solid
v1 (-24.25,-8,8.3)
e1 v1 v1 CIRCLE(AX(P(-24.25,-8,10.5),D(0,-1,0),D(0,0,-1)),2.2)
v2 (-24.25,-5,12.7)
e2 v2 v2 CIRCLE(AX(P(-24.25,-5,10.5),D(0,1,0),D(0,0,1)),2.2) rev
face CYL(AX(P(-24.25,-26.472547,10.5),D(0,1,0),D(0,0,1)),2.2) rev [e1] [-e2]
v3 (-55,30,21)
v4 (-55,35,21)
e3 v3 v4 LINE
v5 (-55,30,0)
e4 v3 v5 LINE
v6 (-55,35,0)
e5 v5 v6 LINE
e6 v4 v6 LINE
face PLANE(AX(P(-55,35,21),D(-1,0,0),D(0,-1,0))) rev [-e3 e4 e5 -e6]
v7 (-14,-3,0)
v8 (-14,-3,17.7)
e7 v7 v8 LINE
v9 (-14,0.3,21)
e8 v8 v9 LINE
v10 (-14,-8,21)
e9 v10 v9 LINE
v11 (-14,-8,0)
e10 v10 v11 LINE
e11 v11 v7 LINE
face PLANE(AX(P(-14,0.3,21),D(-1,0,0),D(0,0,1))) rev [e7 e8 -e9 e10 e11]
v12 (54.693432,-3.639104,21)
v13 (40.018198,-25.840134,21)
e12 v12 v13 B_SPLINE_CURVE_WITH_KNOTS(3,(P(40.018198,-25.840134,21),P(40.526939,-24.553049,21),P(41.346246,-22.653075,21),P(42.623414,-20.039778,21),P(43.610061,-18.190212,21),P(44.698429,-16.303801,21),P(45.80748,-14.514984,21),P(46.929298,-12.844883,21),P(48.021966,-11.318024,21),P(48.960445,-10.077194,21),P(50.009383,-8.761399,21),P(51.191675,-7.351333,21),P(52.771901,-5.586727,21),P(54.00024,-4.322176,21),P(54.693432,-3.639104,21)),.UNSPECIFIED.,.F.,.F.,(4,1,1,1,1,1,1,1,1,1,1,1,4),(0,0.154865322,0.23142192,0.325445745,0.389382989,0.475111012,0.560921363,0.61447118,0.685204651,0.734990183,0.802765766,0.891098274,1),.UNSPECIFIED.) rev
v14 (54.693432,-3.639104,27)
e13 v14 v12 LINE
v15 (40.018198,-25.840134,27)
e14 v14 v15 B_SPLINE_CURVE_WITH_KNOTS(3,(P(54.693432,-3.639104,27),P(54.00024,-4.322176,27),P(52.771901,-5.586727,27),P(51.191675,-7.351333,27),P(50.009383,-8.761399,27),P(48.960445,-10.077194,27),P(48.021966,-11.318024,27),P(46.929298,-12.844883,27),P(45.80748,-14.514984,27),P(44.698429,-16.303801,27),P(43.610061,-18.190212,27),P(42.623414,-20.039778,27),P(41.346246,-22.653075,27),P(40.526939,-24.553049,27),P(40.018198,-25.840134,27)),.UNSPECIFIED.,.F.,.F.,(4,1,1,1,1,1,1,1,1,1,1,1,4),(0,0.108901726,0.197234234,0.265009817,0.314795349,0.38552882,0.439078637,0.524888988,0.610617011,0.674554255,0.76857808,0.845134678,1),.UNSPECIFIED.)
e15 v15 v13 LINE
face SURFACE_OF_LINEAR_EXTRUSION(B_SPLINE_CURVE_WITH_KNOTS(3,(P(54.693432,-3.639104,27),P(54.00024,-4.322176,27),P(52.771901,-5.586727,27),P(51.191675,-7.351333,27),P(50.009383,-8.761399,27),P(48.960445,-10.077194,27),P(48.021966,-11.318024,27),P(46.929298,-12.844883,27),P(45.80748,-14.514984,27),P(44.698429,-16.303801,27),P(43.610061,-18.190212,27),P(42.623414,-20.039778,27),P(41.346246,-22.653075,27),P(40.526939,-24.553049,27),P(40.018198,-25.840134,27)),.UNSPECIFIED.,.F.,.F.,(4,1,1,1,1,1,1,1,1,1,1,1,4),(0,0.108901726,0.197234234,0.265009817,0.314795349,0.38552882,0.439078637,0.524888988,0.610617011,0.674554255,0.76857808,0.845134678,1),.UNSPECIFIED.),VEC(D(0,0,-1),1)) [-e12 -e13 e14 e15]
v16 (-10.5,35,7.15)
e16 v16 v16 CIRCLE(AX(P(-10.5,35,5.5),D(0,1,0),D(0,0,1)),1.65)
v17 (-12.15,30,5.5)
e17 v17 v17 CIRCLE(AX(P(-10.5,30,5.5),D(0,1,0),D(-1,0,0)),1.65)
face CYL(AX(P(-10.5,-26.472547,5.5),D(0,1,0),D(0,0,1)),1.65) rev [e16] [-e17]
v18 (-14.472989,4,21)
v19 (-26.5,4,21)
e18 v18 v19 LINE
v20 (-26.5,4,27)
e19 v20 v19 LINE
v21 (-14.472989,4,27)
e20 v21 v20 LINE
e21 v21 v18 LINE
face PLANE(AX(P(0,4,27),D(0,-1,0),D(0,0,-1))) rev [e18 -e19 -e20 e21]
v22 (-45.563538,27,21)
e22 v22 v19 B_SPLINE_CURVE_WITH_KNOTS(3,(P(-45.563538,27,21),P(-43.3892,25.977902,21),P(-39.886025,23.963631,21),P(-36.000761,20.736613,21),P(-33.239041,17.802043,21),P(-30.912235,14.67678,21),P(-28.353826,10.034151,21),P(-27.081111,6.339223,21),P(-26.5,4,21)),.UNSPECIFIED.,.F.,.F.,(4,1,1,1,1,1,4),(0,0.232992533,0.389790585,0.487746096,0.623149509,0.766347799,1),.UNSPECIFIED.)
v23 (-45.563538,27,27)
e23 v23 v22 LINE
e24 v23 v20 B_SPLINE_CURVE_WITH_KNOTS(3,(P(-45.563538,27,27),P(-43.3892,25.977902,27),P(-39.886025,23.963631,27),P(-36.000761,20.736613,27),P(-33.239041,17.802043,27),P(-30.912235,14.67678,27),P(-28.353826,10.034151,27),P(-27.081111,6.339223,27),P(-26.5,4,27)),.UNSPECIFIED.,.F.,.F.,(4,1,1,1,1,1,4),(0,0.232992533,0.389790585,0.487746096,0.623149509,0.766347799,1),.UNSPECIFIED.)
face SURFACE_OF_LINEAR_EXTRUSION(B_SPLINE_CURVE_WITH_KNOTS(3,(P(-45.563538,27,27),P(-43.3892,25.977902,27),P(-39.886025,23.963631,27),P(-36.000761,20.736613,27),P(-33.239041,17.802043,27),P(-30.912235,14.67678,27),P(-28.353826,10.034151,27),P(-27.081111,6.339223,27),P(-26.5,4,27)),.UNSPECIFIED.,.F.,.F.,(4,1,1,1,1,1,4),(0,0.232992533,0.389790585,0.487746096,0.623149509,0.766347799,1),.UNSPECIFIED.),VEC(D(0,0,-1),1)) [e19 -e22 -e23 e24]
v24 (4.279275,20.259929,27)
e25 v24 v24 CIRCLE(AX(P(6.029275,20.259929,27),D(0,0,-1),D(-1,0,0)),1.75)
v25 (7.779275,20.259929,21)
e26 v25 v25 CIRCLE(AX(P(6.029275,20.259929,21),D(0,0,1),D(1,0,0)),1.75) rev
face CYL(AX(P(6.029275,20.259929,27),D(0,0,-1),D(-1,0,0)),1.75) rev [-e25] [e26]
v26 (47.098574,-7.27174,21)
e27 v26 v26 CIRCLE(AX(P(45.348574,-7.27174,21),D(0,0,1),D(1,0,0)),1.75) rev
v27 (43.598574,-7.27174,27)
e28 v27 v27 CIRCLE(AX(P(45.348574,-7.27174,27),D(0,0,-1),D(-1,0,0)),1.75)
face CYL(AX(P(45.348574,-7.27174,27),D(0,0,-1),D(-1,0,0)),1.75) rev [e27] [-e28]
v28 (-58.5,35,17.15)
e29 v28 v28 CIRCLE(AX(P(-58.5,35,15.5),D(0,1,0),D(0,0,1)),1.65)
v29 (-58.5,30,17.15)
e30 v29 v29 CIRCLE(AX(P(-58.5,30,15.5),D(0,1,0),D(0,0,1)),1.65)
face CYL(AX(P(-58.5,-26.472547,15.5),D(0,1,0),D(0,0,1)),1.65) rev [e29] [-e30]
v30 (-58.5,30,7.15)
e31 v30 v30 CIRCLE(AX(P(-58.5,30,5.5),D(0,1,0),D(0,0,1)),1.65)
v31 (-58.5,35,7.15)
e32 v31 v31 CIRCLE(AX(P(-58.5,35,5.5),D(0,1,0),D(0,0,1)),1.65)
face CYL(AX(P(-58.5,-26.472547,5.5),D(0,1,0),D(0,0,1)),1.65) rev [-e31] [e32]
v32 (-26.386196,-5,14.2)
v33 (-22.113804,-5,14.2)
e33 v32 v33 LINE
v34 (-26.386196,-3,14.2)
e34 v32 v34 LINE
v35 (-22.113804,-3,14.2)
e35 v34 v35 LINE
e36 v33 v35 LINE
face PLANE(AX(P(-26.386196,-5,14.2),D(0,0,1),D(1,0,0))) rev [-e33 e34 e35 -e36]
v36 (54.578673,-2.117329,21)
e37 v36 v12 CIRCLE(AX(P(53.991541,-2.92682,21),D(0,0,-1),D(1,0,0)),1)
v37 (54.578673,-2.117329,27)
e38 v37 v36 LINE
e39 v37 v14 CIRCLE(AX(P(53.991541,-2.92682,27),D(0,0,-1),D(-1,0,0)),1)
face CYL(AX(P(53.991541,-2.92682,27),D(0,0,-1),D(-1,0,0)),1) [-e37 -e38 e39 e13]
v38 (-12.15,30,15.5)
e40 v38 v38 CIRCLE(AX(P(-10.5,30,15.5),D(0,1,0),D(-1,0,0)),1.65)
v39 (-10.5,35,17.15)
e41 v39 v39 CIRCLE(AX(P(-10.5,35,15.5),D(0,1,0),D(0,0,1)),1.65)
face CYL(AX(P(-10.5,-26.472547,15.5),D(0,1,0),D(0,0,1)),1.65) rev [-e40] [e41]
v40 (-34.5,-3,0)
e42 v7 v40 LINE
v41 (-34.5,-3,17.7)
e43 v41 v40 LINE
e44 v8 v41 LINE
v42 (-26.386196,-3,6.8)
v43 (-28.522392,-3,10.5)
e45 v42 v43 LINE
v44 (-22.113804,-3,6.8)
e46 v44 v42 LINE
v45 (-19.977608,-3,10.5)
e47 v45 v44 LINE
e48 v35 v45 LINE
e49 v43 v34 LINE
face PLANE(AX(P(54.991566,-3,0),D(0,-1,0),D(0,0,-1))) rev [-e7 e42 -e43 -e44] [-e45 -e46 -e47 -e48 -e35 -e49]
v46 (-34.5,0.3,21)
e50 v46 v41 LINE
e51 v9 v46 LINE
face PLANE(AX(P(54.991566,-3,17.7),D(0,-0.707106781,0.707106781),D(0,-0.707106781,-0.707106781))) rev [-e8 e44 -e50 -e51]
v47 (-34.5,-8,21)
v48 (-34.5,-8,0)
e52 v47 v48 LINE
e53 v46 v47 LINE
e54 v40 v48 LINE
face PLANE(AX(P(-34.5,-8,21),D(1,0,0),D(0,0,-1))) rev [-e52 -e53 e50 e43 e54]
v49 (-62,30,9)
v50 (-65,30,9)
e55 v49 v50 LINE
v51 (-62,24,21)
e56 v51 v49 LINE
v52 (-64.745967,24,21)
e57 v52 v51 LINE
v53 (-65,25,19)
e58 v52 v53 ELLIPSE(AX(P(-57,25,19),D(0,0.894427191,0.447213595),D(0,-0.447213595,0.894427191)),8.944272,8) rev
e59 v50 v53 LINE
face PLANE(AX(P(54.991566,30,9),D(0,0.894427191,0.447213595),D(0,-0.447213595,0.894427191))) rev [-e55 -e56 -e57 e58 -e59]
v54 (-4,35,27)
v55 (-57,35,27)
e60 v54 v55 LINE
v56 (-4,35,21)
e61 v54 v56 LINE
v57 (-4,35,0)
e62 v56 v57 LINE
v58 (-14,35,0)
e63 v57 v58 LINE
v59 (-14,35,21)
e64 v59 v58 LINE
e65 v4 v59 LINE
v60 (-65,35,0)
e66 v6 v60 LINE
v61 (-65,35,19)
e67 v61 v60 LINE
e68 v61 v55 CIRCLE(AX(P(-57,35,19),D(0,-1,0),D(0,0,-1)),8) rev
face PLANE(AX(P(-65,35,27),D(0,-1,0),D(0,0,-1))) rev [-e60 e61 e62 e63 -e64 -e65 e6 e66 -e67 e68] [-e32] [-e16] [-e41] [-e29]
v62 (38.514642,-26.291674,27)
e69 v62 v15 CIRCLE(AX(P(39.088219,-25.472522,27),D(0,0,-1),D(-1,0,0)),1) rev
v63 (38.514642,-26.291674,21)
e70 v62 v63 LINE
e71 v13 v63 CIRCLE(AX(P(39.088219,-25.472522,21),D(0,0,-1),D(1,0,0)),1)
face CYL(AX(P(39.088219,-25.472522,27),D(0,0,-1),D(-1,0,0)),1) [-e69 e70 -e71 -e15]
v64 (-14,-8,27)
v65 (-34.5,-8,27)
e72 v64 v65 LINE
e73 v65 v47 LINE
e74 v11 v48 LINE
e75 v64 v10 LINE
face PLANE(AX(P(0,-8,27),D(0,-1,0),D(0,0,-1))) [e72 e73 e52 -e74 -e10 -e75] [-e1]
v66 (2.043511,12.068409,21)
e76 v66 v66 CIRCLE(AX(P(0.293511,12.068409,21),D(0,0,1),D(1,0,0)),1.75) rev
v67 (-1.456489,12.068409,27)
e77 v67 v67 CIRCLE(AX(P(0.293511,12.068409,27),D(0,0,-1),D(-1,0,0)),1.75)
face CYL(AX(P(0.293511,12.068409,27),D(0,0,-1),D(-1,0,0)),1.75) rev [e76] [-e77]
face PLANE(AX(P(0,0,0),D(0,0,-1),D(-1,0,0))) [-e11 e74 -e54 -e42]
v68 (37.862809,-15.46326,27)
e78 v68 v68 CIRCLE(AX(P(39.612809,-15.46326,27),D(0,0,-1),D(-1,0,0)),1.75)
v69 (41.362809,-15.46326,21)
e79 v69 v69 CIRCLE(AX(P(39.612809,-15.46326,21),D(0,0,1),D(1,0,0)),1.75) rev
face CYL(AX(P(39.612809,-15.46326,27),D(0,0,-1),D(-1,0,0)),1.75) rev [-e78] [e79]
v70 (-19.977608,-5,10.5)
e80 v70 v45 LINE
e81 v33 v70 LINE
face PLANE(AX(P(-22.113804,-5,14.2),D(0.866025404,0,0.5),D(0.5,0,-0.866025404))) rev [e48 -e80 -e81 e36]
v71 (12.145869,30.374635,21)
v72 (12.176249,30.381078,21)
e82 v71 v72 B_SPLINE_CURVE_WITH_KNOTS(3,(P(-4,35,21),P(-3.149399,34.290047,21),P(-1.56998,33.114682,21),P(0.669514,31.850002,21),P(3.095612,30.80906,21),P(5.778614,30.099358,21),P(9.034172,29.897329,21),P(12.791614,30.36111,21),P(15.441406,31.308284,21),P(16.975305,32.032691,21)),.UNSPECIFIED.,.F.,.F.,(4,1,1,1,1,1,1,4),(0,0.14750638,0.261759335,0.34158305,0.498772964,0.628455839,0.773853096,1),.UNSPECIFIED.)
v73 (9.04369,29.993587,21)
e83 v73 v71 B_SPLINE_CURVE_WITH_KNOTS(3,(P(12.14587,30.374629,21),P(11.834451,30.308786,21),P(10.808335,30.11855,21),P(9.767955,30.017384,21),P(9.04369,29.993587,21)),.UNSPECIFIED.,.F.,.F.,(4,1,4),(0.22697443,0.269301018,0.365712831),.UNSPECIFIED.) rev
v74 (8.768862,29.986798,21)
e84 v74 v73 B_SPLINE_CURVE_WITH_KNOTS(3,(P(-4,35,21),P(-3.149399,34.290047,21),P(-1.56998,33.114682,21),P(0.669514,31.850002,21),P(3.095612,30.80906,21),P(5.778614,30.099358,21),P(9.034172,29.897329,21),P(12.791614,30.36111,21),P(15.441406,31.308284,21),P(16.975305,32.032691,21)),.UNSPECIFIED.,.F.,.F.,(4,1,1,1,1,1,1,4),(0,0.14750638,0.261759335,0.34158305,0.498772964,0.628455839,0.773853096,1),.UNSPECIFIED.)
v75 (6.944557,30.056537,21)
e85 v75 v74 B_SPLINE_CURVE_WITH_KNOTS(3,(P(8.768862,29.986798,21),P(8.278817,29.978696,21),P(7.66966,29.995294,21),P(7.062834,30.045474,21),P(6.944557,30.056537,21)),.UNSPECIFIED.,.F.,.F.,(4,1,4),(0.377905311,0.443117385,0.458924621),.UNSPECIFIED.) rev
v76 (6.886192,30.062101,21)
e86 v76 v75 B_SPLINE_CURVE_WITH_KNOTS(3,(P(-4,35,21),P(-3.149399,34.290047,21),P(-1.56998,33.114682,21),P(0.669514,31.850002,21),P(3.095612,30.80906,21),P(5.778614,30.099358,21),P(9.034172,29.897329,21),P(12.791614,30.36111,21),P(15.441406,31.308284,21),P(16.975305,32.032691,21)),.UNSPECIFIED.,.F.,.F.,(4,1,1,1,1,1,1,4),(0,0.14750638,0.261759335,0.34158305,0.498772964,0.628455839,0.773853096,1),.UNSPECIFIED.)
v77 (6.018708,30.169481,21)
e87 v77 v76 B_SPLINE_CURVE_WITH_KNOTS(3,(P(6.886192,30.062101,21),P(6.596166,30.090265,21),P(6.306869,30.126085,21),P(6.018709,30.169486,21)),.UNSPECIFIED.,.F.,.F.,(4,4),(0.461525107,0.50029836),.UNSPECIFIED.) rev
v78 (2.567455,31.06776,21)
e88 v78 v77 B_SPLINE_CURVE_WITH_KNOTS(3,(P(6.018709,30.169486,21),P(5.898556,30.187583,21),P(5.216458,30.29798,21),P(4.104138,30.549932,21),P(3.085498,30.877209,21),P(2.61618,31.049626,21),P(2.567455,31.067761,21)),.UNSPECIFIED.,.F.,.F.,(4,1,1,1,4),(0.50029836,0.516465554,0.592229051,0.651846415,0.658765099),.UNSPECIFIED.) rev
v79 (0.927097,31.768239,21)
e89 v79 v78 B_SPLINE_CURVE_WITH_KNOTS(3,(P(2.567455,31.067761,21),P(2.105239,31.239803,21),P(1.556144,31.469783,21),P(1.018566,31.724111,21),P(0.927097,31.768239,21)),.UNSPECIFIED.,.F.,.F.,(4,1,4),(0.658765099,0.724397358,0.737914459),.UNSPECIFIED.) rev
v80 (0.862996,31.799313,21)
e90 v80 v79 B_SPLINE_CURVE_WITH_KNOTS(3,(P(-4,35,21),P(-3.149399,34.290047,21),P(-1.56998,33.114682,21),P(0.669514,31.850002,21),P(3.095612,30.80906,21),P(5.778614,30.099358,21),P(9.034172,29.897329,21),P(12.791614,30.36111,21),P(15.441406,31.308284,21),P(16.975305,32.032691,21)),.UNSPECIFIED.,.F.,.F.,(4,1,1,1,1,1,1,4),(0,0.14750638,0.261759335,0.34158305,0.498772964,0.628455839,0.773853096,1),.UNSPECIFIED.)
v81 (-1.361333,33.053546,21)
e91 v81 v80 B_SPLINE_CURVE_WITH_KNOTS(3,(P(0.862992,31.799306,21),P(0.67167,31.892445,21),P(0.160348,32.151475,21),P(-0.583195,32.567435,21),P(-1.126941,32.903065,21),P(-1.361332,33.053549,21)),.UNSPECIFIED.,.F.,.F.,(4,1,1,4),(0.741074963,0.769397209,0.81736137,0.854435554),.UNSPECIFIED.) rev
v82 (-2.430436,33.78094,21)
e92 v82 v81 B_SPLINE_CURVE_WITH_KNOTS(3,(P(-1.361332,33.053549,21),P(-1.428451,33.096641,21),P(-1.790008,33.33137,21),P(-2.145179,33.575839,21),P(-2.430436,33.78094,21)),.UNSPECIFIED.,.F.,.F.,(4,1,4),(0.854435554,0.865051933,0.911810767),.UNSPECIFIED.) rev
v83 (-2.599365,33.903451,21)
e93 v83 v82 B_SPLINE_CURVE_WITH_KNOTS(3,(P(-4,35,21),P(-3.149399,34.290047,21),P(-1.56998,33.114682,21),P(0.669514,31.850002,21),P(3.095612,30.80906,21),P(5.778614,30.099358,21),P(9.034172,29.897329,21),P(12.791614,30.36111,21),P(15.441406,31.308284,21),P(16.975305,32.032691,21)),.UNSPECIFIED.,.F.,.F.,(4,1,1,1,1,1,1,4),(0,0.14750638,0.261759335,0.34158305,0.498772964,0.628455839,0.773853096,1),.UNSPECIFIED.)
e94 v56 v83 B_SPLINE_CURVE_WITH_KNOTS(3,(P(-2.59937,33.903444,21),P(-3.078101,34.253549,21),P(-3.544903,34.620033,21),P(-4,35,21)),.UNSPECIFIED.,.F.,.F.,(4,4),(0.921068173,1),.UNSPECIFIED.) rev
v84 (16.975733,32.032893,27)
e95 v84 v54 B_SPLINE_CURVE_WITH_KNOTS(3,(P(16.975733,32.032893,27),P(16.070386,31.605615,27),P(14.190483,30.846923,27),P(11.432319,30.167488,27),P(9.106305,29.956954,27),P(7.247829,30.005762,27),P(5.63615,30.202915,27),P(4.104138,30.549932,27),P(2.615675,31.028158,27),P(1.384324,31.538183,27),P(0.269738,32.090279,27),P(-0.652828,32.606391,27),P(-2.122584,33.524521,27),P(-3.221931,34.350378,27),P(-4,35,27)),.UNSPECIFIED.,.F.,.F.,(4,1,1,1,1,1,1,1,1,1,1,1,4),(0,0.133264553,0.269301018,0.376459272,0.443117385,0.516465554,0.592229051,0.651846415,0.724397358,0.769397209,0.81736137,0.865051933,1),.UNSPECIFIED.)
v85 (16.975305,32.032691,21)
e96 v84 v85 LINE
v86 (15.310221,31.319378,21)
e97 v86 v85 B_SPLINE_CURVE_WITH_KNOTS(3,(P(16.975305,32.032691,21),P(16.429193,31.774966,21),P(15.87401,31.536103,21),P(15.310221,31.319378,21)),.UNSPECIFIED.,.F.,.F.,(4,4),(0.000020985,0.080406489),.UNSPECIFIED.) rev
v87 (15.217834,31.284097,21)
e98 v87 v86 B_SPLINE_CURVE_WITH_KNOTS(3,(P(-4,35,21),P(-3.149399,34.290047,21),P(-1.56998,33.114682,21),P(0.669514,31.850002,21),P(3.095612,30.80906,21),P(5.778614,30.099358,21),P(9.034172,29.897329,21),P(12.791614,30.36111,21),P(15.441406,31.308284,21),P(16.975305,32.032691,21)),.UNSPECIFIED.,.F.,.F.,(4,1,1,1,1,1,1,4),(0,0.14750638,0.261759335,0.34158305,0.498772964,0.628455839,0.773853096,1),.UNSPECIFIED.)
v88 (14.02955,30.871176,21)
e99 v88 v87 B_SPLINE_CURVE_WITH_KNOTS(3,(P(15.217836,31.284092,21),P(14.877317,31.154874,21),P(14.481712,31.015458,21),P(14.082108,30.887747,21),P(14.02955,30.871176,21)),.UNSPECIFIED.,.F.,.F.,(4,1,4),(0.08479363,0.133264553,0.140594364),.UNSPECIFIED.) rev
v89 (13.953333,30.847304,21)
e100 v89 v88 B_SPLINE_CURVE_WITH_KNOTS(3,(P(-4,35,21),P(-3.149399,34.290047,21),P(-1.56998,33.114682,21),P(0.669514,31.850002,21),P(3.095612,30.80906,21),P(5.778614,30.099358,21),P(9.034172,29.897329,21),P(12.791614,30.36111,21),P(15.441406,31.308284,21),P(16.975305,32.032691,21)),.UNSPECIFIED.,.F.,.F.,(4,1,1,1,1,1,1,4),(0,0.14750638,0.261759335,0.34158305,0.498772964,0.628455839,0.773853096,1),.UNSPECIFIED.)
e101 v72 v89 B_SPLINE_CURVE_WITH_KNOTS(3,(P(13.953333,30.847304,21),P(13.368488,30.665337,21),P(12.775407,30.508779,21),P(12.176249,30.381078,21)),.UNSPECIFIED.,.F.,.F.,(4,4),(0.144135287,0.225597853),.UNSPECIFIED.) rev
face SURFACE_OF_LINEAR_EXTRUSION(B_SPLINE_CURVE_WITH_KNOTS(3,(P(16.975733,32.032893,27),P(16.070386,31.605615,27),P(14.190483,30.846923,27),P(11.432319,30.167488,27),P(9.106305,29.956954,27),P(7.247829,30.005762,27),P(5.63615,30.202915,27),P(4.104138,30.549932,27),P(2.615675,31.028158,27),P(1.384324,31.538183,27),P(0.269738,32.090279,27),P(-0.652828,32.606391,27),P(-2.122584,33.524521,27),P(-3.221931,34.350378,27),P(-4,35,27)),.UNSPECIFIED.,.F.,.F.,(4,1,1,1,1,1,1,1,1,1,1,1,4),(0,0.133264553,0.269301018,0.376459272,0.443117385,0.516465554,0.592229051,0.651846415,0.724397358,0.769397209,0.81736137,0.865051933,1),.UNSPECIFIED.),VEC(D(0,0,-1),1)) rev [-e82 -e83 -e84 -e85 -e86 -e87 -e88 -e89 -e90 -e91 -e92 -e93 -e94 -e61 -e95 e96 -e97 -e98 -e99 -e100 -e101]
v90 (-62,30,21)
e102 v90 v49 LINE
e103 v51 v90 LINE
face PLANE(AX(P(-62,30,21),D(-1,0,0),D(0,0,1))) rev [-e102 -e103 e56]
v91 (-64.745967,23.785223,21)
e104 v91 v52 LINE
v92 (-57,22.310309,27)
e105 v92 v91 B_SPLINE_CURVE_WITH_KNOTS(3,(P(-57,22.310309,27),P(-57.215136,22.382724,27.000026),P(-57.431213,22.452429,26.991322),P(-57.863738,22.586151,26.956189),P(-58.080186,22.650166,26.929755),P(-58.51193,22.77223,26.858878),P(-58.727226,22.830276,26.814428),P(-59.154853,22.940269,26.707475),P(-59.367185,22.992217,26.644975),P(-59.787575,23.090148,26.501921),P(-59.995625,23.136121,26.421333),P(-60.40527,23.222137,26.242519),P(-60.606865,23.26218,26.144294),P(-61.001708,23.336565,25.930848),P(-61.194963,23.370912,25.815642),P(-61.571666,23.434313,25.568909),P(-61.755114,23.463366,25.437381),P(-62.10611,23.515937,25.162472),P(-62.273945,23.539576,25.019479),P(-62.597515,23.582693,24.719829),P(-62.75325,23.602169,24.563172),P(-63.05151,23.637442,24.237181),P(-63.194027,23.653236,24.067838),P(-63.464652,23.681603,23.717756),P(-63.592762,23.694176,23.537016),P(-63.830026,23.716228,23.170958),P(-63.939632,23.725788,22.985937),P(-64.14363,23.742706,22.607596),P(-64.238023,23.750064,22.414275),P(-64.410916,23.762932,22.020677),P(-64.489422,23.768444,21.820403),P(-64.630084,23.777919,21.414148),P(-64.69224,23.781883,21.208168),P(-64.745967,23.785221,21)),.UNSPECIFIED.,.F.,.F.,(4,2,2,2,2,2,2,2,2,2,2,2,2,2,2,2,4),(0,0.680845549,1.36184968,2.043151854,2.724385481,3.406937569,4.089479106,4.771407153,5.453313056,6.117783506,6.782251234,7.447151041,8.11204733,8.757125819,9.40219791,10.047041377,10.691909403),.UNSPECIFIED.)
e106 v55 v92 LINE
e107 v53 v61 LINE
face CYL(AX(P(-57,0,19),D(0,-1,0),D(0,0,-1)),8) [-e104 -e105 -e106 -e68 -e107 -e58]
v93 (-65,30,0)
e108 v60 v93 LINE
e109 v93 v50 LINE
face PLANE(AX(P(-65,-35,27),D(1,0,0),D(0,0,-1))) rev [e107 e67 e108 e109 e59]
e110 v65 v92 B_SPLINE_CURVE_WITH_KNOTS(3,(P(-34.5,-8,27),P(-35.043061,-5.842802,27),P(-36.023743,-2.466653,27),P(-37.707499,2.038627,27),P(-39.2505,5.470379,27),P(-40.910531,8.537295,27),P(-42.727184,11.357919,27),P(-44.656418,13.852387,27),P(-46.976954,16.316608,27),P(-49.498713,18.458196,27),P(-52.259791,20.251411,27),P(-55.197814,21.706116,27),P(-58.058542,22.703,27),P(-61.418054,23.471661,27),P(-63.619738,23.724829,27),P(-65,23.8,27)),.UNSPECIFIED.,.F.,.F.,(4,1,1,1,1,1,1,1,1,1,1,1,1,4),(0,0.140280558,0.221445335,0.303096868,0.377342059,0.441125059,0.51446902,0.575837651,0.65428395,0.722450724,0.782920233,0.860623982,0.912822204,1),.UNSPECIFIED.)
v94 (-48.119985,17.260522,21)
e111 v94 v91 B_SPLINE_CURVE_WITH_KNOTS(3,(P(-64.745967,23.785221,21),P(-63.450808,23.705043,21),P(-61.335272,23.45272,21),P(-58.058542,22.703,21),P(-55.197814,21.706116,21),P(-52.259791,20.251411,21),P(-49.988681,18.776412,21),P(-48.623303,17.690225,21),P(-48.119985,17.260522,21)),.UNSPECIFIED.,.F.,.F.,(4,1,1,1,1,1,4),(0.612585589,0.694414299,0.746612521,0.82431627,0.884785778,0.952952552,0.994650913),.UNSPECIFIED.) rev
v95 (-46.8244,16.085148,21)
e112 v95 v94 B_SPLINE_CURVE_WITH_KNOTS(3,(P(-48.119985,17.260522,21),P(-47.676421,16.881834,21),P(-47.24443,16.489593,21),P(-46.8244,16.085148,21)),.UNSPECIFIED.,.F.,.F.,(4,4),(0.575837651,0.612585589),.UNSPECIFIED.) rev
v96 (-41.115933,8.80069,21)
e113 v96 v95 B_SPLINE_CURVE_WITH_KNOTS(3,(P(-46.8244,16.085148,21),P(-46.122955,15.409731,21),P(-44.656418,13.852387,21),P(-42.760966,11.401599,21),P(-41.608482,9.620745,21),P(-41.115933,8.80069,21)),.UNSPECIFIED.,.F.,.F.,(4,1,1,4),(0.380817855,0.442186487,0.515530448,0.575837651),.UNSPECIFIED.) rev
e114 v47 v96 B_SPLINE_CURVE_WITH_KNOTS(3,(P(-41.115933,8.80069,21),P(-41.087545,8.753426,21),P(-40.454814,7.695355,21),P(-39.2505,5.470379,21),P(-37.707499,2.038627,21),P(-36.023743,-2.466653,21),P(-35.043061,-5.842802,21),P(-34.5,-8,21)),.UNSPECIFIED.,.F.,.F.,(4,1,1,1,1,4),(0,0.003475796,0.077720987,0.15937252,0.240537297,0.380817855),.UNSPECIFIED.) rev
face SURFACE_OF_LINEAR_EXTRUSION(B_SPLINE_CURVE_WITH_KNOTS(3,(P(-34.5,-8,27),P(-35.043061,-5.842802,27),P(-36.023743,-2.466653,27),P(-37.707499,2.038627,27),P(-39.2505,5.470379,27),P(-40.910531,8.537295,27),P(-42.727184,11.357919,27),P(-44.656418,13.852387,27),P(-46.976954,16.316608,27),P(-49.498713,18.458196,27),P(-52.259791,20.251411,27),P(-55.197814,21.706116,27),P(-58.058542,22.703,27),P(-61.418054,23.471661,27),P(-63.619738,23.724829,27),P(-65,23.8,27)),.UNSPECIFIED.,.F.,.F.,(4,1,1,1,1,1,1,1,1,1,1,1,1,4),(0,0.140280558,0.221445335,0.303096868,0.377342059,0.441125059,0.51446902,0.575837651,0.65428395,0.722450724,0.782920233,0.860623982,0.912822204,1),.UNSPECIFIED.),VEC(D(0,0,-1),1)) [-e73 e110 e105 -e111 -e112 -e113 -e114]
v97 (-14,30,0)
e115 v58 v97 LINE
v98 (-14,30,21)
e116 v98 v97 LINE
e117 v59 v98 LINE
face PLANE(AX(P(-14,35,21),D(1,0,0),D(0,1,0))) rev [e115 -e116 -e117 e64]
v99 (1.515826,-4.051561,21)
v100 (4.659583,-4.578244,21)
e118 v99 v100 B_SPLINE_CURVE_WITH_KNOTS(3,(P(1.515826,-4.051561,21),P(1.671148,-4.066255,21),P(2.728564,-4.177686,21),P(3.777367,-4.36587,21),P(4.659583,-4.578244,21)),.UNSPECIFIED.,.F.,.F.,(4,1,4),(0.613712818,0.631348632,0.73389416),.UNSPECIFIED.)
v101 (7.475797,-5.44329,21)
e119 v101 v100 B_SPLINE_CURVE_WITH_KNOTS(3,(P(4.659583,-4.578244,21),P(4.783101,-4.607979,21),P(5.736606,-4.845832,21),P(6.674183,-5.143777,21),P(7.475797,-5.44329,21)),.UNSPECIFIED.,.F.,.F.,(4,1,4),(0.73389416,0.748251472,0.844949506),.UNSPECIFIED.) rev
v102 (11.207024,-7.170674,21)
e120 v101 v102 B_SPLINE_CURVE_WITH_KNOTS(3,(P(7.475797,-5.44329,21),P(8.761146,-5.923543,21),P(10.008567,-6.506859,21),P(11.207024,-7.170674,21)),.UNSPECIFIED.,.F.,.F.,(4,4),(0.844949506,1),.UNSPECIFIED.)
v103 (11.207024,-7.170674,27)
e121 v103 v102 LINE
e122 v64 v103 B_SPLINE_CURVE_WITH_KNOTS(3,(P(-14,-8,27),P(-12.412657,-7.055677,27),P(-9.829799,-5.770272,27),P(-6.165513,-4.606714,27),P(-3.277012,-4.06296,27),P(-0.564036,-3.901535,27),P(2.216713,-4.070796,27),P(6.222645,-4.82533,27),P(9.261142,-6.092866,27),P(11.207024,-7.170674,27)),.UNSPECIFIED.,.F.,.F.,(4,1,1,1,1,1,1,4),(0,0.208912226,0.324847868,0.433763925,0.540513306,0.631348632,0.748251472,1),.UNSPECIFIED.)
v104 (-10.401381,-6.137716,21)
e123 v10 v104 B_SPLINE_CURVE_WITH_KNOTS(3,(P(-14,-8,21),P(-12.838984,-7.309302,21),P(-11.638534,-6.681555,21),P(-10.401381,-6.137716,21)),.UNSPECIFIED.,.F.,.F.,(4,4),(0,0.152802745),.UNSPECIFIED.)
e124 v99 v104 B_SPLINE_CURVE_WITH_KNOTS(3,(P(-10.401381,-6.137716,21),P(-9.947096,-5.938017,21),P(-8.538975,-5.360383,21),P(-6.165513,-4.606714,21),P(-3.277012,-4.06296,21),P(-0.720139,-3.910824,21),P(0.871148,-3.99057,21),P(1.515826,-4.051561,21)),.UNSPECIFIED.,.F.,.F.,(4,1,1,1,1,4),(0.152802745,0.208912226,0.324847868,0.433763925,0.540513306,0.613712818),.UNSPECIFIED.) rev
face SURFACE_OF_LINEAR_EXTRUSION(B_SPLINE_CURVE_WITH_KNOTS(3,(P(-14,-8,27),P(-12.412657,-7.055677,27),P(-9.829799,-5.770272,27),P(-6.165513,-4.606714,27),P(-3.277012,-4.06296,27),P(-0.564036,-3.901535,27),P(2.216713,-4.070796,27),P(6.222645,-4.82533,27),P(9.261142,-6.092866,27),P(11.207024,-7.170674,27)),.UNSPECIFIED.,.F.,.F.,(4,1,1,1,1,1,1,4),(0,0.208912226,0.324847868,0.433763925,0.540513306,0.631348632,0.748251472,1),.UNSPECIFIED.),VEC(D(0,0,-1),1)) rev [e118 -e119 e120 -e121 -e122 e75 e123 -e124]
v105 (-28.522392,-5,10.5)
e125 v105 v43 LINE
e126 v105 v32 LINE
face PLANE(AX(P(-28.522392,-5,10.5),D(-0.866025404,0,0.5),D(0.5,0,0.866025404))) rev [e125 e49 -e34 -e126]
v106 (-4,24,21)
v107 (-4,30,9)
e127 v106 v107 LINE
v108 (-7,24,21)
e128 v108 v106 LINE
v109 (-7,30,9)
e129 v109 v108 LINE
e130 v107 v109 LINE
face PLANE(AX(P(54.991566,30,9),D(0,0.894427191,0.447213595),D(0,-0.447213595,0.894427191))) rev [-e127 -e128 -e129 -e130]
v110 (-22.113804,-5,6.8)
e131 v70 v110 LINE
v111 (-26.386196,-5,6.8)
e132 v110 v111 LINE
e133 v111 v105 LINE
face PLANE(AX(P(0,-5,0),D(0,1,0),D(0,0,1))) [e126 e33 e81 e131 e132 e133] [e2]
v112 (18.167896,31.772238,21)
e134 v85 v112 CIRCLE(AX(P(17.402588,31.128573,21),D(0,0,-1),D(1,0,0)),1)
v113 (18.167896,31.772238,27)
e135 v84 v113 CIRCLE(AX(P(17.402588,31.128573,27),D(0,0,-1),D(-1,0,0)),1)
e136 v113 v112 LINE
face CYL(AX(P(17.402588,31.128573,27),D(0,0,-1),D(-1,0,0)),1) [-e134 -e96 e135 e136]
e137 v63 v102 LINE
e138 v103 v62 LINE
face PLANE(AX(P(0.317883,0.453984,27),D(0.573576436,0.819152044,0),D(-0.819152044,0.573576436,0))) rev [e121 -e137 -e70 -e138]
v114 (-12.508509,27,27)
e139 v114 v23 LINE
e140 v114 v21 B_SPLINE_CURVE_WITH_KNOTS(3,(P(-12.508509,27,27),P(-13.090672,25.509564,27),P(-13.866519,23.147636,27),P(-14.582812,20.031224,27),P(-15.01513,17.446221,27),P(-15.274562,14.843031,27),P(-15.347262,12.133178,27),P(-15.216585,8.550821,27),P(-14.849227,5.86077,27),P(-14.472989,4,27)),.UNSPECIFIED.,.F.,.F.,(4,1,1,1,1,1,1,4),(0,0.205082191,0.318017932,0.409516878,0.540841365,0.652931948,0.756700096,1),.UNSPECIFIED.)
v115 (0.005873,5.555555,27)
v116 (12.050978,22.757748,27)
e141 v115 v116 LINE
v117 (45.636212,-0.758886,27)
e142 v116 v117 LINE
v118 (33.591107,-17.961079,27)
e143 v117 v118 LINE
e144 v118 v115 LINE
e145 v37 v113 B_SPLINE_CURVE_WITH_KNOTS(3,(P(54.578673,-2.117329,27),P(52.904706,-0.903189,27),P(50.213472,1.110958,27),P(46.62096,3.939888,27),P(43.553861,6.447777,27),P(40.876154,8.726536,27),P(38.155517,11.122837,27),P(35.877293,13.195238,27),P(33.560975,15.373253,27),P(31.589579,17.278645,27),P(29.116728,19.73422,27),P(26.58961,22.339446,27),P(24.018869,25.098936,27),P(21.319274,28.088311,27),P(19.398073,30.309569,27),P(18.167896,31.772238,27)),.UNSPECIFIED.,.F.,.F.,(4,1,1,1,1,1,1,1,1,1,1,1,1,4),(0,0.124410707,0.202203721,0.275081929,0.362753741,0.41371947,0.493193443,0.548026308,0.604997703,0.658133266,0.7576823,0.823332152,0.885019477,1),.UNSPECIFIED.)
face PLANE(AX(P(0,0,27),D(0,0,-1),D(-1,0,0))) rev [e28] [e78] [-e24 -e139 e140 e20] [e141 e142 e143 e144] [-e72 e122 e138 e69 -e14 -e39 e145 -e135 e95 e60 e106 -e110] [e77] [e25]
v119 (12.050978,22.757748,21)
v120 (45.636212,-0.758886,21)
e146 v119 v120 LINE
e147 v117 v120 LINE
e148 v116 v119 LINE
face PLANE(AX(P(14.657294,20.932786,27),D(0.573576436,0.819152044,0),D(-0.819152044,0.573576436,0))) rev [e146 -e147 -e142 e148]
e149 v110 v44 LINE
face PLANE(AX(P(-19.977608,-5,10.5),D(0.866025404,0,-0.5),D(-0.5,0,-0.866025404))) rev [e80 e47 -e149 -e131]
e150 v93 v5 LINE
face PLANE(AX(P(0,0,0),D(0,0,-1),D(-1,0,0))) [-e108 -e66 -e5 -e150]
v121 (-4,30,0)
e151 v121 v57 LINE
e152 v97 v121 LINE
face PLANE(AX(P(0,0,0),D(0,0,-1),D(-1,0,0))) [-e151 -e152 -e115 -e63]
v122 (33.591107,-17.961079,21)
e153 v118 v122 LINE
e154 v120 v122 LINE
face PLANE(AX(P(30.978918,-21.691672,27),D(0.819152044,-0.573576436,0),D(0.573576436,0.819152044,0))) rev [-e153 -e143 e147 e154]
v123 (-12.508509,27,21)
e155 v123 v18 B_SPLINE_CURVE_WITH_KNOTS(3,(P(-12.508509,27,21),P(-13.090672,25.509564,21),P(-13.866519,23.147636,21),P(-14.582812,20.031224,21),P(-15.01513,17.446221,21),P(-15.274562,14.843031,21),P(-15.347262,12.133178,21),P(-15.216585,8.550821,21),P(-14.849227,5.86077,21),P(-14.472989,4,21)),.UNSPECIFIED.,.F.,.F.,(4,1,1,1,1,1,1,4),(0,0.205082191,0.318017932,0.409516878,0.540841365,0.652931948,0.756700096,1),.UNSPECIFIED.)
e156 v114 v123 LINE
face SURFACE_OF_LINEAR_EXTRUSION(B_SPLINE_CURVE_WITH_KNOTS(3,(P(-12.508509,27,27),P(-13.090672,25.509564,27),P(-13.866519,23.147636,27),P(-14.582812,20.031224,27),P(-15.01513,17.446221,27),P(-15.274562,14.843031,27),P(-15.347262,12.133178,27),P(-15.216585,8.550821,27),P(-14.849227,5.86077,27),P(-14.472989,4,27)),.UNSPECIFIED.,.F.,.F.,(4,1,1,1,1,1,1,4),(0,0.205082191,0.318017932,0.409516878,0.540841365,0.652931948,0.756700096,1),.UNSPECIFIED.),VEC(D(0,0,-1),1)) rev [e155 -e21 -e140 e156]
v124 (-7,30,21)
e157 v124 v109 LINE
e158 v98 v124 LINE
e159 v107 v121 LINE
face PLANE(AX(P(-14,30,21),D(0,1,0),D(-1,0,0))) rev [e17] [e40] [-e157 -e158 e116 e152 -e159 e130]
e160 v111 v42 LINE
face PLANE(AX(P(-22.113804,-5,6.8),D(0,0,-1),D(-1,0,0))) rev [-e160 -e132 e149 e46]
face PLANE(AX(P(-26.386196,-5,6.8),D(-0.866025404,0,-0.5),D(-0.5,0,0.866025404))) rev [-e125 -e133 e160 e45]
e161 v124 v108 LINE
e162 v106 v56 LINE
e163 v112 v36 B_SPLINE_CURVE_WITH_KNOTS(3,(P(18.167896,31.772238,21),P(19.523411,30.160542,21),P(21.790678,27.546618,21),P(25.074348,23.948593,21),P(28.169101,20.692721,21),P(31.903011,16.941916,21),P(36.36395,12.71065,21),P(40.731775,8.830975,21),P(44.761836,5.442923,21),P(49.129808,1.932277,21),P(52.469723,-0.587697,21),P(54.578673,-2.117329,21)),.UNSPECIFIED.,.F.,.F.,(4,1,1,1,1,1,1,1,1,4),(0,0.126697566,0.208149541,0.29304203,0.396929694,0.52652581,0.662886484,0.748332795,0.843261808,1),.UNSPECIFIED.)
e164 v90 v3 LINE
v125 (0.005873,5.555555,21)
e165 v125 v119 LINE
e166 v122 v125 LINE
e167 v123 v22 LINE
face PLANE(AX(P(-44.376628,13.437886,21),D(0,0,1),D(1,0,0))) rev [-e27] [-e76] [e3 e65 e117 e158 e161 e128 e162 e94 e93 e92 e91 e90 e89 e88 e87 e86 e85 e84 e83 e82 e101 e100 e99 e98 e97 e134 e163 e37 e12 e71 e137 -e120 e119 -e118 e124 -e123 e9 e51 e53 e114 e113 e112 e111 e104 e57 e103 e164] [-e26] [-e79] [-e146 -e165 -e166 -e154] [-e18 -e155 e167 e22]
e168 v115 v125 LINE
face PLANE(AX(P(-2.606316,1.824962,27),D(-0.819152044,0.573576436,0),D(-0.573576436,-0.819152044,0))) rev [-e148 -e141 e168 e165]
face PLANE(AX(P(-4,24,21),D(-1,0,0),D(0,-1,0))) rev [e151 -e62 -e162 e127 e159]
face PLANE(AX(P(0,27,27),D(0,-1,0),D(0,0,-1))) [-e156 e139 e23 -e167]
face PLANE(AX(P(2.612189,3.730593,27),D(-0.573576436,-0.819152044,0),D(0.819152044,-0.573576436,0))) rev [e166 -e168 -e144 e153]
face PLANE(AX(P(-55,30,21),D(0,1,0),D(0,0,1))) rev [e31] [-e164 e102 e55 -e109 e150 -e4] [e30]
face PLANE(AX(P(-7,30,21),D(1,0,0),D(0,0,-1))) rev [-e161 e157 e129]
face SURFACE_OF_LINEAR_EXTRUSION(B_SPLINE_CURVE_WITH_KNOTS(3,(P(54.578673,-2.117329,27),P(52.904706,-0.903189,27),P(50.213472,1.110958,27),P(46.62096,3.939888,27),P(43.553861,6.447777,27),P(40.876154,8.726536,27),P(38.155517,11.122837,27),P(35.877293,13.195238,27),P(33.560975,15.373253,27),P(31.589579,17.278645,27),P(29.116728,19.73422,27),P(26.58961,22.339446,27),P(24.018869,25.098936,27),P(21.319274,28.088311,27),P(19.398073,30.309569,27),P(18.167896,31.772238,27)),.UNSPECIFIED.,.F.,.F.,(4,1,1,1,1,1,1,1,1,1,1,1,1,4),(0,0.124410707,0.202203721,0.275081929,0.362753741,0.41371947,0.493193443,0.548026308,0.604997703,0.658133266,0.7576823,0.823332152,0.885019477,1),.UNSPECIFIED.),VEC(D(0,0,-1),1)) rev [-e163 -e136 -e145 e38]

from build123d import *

# Parameters (mm, degrees)
SKETCH1_W               = 130
SKETCH1_H               = 70
BOSS_EXTRUDE1_DEPTH     = 27
SKETCH2_R               = 1.75
CUT_EXTRUDE1_DEPTH      = 79.606615498
CUT_EXTRUDE2_START      = -21
CUT_EXTRUDE2_OUTLINE_R  = 1.75
CUT_EXTRUDE2_DEPTH      = 21
CUT_EXTRUDE3_DEPTH      = 100.813505607
CUT_EXTRUDE3_DEPTH_BACK = 100.813505607
SKETCH5_R               = 1.65
SKETCH5_R_2             = 2.2
CUT_EXTRUDE4_DEPTH      = 94.44983135
CUT_EXTRUDE5_DEPTH      = 2
FILLET1_R               = 8


# Read off the part's stored shape, not the designer's step: Cut-Extrude2
with BuildPart() as part:
    # Sketch1 → Boss-Extrude1 (new body)
    with BuildSketch(Plane.XY):
        Rectangle(SKETCH1_W, SKETCH1_H)
    extrude(amount=BOSS_EXTRUDE1_DEPTH)

    # Sketch2 → Cut-Extrude1 (cut, through all)
    with BuildSketch(Plane(origin=(0, 0, 0), x_dir=(-1, 0, 0), z_dir=(0, 0, -1))):
        with BuildLine():
            add(Edge.make_bspline(
                [(14, -8), (12.412656523, -7.055676593), (9.829799179, -5.770272176), (6.165512557, -4.606713552), (3.277012022, -4.062959942), (0.564036018, -3.901535266), (-2.216713416, -4.070795733), (-6.222645376, -4.825329711), (-9.261142271, -6.092866446), (-11.207024466, -7.170674217)],
                knots=[0, 0, 0, 0, 0.208912226, 0.324847868, 0.433763925, 0.540513306, 0.631348632, 0.748251472, 1, 1, 1, 1], degree=3))
            Line((-11.207024466, -7.170674217), (-38.514642112, -26.291673943))
            ThreePointArc((-38.514642112, -26.291673943), (-39.375842934, -26.43026519), (-40.018197727, -25.840134095))
            add(Edge.make_bspline(
                [(-54.693432206, -3.639104104), (-54.000239817, -4.322176148), (-52.771901008, -5.586727304), (-51.191675368, -7.351333396), (-50.009383391, -8.761398854), (-48.960444962, -10.077193603), (-48.021966464, -11.318023658), (-46.929298413, -12.844883167), (-45.807480175, -14.514983511), (-44.698429074, -16.303801358), (-43.610061024, -18.190212069), (-42.623413939, -20.039778385), (-41.346245965, -22.653074903), (-40.526939035, -24.553048699), (-40.018197727, -25.840134095)],
                knots=[0, 0, 0, 0, 0.108901726, 0.197234234, 0.265009817, 0.314795349, 0.38552882, 0.439078637, 0.524888988, 0.610617011, 0.674554255, 0.76857808, 0.845134678, 1, 1, 1, 1], degree=3))
            ThreePointArc((-54.693432206, -3.639104104), (-54.988709395, -2.851622056), (-54.578672675, -2.11732887))
            add(Edge.make_bspline(
                [(-54.578672675, -2.11732887), (-52.904706158, -0.903188565), (-50.213471625, 1.1109576), (-46.620959917, 3.939887731), (-43.553861019, 6.447777415), (-40.876153765, 8.726535519), (-38.155516815, 11.122837462), (-35.877293384, 13.195237532), (-33.560975223, 15.373252509), (-31.589578869, 17.278645179), (-29.116728404, 19.73422006), (-26.589609741, 22.339446363), (-24.018869132, 25.098935859), (-21.319274087, 28.088310862), (-19.398072944, 30.309569394), (-18.167896158, 31.772237731)],
                knots=[0, 0, 0, 0, 0.124410707, 0.202203721, 0.275081929, 0.362753741, 0.41371947, 0.493193443, 0.548026308, 0.604997703, 0.658133266, 0.7576823, 0.823332152, 0.885019477, 1, 1, 1, 1], degree=3))
            ThreePointArc((-18.167896158, 31.772237731), (-17.616183173, 32.105495699), (-16.975732581, 32.032893158))
            add(Edge.make_bspline(
                [(-16.975732581, 32.032893158), (-16.07038591, 31.605615141), (-14.190483196, 30.84692344), (-11.432318602, 30.167487646), (-9.106305345, 29.956953669), (-7.247829325, 30.005761544), (-5.636150486, 30.202914826), (-4.104137993, 30.549932261), (-2.615674759, 31.028158171), (-1.384323931, 31.538183258), (-0.269738408, 32.090279064), (0.652828442, 32.606390757), (2.122584172, 33.524520801), (3.221931153, 34.350377975), (4, 35)],
                knots=[0, 0, 0, 0, 0.133264553, 0.269301018, 0.376459272, 0.443117385, 0.516465554, 0.592229051, 0.651846415, 0.724397358, 0.769397209, 0.81736137, 0.865051933, 1, 1, 1, 1], degree=3))
            Line((4, 35), (-65, 35))
            Line((-65, 35), (-65, -35))
            Line((-65, -35), (65, -35))
            Line((65, -35), (65, 23.8))
            add(Edge.make_bspline(
                [(34.5, -8), (35.043061412, -5.842802386), (36.023743001, -2.466653125), (37.707498645, 2.038626647), (39.250500058, 5.470378664), (40.910531254, 8.537294569), (42.727183517, 11.357919306), (44.656417758, 13.852387174), (46.976953716, 16.316608014), (49.498712998, 18.458196173), (52.259790918, 20.25141053), (55.197814462, 21.706116383), (58.058541869, 22.702999613), (61.418054191, 23.471660912), (63.619738318, 23.724829372), (65, 23.8)],
                knots=[0, 0, 0, 0, 0.140280558, 0.221445335, 0.303096868, 0.377342059, 0.441125059, 0.51446902, 0.575837651, 0.65428395, 0.722450724, 0.782920233, 0.860623982, 0.912822204, 1, 1, 1, 1], degree=3))
            Line((34.5, -8), (14, -8))
        make_face()
        Polygon((-33.591106657, -17.961078948), (-0.005872841, 5.555554943), (-12.050978004, 22.757747873), (-45.63621182, -0.758886018), align=None)
        with Locations((-45.348573575, -7.271739788)):
            Circle(SKETCH2_R)
        with Locations((-39.612809212, -15.463260231)):
            Circle(SKETCH2_R)
        with Locations((-0.293511086, 12.068408714)):
            Circle(SKETCH2_R)
        with Locations((-6.029275449, 20.259929156)):
            Circle(SKETCH2_R)
        with BuildLine():
            add(Edge.make_bspline(
                [(45.563538233, 27), (43.389199875, 25.977901541), (39.886025201, 23.963630926), (36.000760835, 20.736612979), (33.23904056, 17.802043425), (30.912235406, 14.67678007), (28.353826133, 10.034151363), (27.08111073, 6.339222762), (26.5, 4)],
                knots=[0, 0, 0, 0, 0.232992533, 0.389790585, 0.487746096, 0.623149509, 0.766347799, 1, 1, 1, 1], degree=3))
            Line((26.5, 4), (14.472989206, 4))
            add(Edge.make_bspline(
                [(12.50850871, 27), (13.090671786, 25.509563557), (13.866518923, 23.147635977), (14.582812232, 20.03122413), (15.015130042, 17.446221031), (15.274561682, 14.843030618), (15.347261596, 12.133178471), (15.216584761, 8.550820577), (14.849227023, 5.860770346), (14.472989206, 4)],
                knots=[0, 0, 0, 0, 0.205082191, 0.318017932, 0.409516878, 0.540841365, 0.652931948, 0.756700096, 1, 1, 1, 1], degree=3))
            Line((12.50850871, 27), (45.563538233, 27))
        make_face()
    extrude(amount=-CUT_EXTRUDE1_DEPTH, mode=Mode.SUBTRACT)

    # Cut-Extrude2 outline → Cut-Extrude2 (cut)
    with BuildSketch(Plane(origin=(0, 0, 0), x_dir=(-1, 0, 0), z_dir=(0, 0, -1)).offset(CUT_EXTRUDE2_START)):
        with BuildLine():
            Line((7, 24), (4, 24))
            Line((4, 24), (4, 35))
            add(Edge.make_bspline(
                [(4, 35), (3.221931153, 34.350377975), (2.122584172, 33.524520801), (0.652828442, 32.606390757), (-0.269738408, 32.090279064), (-1.384323931, 31.538183258), (-2.615674759, 31.028158171), (-4.104137993, 30.549932261), (-5.636150486, 30.202914826), (-7.247829325, 30.005761544), (-9.106305345, 29.956953669), (-11.432318602, 30.167487646), (-14.190483196, 30.84692344), (-16.07038591, 31.605615141), (-16.975732581, 32.032893158)],
                knots=[2.0985e-05, 2.0985e-05, 2.0985e-05, 2.0985e-05, 0.134969052, 0.182659615, 0.230623776, 0.275623627, 0.34817457, 0.407791934, 0.483555431, 0.5569036, 0.623561713, 0.730719967, 0.866756432, 1.000020985, 1.000020985, 1.000020985, 1.000020985], degree=3))
            ThreePointArc((-16.975732581, 32.032893158), (-17.616183174, 32.105495699), (-18.167896158, 31.772237731))
            add(Edge.make_bspline(
                [(-54.578672675, -2.11732887), (-52.904706158, -0.903188565), (-50.213471625, 1.1109576), (-46.620959917, 3.939887731), (-43.553861019, 6.447777415), (-40.876153765, 8.726535519), (-38.155516815, 11.122837462), (-35.877293384, 13.195237532), (-33.560975223, 15.373252509), (-31.589578869, 17.278645179), (-29.116728404, 19.73422006), (-26.589609741, 22.339446363), (-24.018869132, 25.098935859), (-21.319274087, 28.088310862), (-19.398072944, 30.309569394), (-18.167896158, 31.772237731)],
                knots=[0, 0, 0, 0, 0.124410707, 0.202203721, 0.275081929, 0.362753741, 0.41371947, 0.493193443, 0.548026308, 0.604997703, 0.658133266, 0.7576823, 0.823332152, 0.885019477, 1, 1, 1, 1], degree=3))
            ThreePointArc((-54.578672675, -2.11732887), (-54.988709395, -2.851622056), (-54.693432206, -3.639104104))
            add(Edge.make_bspline(
                [(-54.693432206, -3.639104104), (-54.000239817, -4.322176148), (-52.771901008, -5.586727304), (-51.191675368, -7.351333396), (-50.009383391, -8.761398854), (-48.960444962, -10.077193603), (-48.021966464, -11.318023658), (-46.929298413, -12.844883167), (-45.807480175, -14.514983511), (-44.698429074, -16.303801358), (-43.610061024, -18.190212069), (-42.623413939, -20.039778385), (-41.346245965, -22.653074903), (-40.526939035, -24.553048699), (-40.018197727, -25.840134095)],
                knots=[0, 0, 0, 0, 0.108901726, 0.197234234, 0.265009817, 0.314795349, 0.38552882, 0.439078637, 0.524888988, 0.610617011, 0.674554255, 0.76857808, 0.845134678, 1, 1, 1, 1], degree=3))
            ThreePointArc((-40.018197727, -25.840134095), (-39.375842934, -26.43026519), (-38.514642112, -26.291673943))
            Line((-38.514642112, -26.291673943), (-11.207024466, -7.170674217))
            add(Edge.make_bspline(
                [(14, -8), (12.412656523, -7.055676593), (9.829799179, -5.770272176), (6.165512557, -4.606713552), (3.277012022, -4.062959942), (0.564036018, -3.901535266), (-2.216713416, -4.070795733), (-6.222645376, -4.825329711), (-9.261142271, -6.092866446), (-11.207024466, -7.170674217)],
                knots=[0, 0, 0, 0, 0.208912226, 0.324847868, 0.433763925, 0.540513306, 0.631348632, 0.748251472, 1, 1, 1, 1], degree=3))
            Line((14, -8), (14, 0.3))
            Line((14, 0.3), (34.5, 0.3))
            Line((34.5, 0.3), (34.5, -8))
            add(Edge.make_bspline(
                [(34.5, -8), (35.043061412, -5.842802386), (36.023743001, -2.466653125), (37.707498645, 2.038626647), (39.250500058, 5.470378664), (40.910531254, 8.537294569), (42.727183517, 11.357919306), (44.656417758, 13.852387174), (46.976953716, 16.316608014), (49.498712998, 18.458196173), (52.259790918, 20.25141053), (55.197814462, 21.706116383), (58.058541869, 22.702999613), (61.418054191, 23.471660912), (63.619738318, 23.724829372), (65, 23.8)],
                knots=[0, 0, 0, 0, 0.140280558, 0.221445335, 0.303096868, 0.377342059, 0.441125059, 0.51446902, 0.575837651, 0.65428395, 0.722450724, 0.782920233, 0.860623982, 0.912822204, 1, 1, 1, 1], degree=3))
            Line((65, 23.8), (65, 24))
            Line((65, 24), (62, 24))
            Line((62, 24), (62, 30))
            Line((62, 30), (55, 30))
            Line((55, 30), (55, 35))
            Line((55, 35), (14, 35))
            Line((14, 35), (14, 30))
            Line((14, 30), (7, 30))
            Line((7, 30), (7, 24))
        make_face()
        with Locations((-39.612809212, -15.463260231)):
            Circle(CUT_EXTRUDE2_OUTLINE_R, mode=Mode.SUBTRACT)
        with Locations((-45.348573575, -7.271739788)):
            Circle(CUT_EXTRUDE2_OUTLINE_R, mode=Mode.SUBTRACT)
        Polygon((-0.005872841, 5.555554943), (-33.591106657, -17.961078948), (-45.63621182, -0.758886018), (-12.050978004, 22.757747873), align=None, mode=Mode.SUBTRACT)
        with Locations((-0.293511086, 12.068408714)):
            Circle(CUT_EXTRUDE2_OUTLINE_R, mode=Mode.SUBTRACT)
        with Locations((-6.029275449, 20.259929156)):
            Circle(CUT_EXTRUDE2_OUTLINE_R, mode=Mode.SUBTRACT)
        with BuildLine():
            Line((12.50850871, 27), (45.563538233, 27))
            add(Edge.make_bspline(
                [(45.563538233, 27), (43.389199875, 25.977901541), (39.886025201, 23.963630926), (36.000760835, 20.736612979), (33.23904056, 17.802043425), (30.912235406, 14.67678007), (28.353826133, 10.034151363), (27.08111073, 6.339222762), (26.5, 4)],
                knots=[0, 0, 0, 0, 0.232992533, 0.389790585, 0.487746096, 0.623149509, 0.766347799, 1, 1, 1, 1], degree=3))
            Line((26.5, 4), (14.472989206, 4))
            add(Edge.make_bspline(
                [(12.50850871, 27), (13.090671786, 25.509563557), (13.866518923, 23.147635977), (14.582812232, 20.03122413), (15.015130042, 17.446221031), (15.274561682, 14.843030618), (15.347261596, 12.133178471), (15.216584761, 8.550820577), (14.849227023, 5.860770346), (14.472989206, 4)],
                knots=[0, 0, 0, 0, 0.205082191, 0.318017932, 0.409516878, 0.540841365, 0.652931948, 0.756700096, 1, 1, 1, 1], degree=3))
        make_face(mode=Mode.SUBTRACT)
    extrude(amount=CUT_EXTRUDE2_DEPTH, mode=Mode.SUBTRACT)

    # Sketch4 → Cut-Extrude3 (cut, two sides: drawn at the far end of the back side and taken through both)
    with BuildSketch(Plane.ZY.offset(34.5).offset(-CUT_EXTRUDE3_DEPTH_BACK)):
        Polygon((0, 24), (0, 30), (9, 30), (21, 24), align=None)
        Polygon((0, 0.3), (0, -3), (17.7, -3), (21, 0.3), align=None)
    extrude(amount=CUT_EXTRUDE3_DEPTH + CUT_EXTRUDE3_DEPTH_BACK, mode=Mode.SUBTRACT)

    # Sketch5 → Cut-Extrude4 (cut, through all)
    with BuildSketch(Plane(origin=(0, 35, 0), x_dir=(1, 0, 0), z_dir=(0, 1, 0))):
        with Locations(Location((-10.5, -5.5, 0), (0, 0, 270))):
            Circle(SKETCH5_R)
        with Locations(Location((-10.5, -15.5, 0), (0, 0, 270))):
            Circle(SKETCH5_R)
        with Locations(Location((-58.5, -15.5, 0), (0, 0, 270))):
            Circle(SKETCH5_R)
        with Locations(Location((-58.5, -5.5, 0), (0, 0, 270))):
            Circle(SKETCH5_R)
        with Locations(Location((-24.25, -10.5, 0), (0, 0, 90))):
            Circle(SKETCH5_R_2)
    extrude(amount=-CUT_EXTRUDE4_DEPTH, mode=Mode.SUBTRACT)

    # Sketch6 → Cut-Extrude5 (cut)
    with BuildSketch(Plane(origin=(0, -3, 0), x_dir=(1, 0, 0), z_dir=(0, 1, 0))):
        Polygon((-19.977608008, -10.5), (-22.113804004, -6.8), (-26.386195996, -6.8), (-28.522391992, -10.5), (-26.386195996, -14.2), (-22.113804004, -14.2), align=None)
    extrude(amount=-CUT_EXTRUDE5_DEPTH, mode=Mode.SUBTRACT)

    # Fillet1
    fillet1_edges = [part.edges().sort_by_distance(p)[0] for p in [
        (-65, 29.4, 27),
    ]]
    fillet(fillet1_edges, radius=FILLET1_R)


solid = part.part
